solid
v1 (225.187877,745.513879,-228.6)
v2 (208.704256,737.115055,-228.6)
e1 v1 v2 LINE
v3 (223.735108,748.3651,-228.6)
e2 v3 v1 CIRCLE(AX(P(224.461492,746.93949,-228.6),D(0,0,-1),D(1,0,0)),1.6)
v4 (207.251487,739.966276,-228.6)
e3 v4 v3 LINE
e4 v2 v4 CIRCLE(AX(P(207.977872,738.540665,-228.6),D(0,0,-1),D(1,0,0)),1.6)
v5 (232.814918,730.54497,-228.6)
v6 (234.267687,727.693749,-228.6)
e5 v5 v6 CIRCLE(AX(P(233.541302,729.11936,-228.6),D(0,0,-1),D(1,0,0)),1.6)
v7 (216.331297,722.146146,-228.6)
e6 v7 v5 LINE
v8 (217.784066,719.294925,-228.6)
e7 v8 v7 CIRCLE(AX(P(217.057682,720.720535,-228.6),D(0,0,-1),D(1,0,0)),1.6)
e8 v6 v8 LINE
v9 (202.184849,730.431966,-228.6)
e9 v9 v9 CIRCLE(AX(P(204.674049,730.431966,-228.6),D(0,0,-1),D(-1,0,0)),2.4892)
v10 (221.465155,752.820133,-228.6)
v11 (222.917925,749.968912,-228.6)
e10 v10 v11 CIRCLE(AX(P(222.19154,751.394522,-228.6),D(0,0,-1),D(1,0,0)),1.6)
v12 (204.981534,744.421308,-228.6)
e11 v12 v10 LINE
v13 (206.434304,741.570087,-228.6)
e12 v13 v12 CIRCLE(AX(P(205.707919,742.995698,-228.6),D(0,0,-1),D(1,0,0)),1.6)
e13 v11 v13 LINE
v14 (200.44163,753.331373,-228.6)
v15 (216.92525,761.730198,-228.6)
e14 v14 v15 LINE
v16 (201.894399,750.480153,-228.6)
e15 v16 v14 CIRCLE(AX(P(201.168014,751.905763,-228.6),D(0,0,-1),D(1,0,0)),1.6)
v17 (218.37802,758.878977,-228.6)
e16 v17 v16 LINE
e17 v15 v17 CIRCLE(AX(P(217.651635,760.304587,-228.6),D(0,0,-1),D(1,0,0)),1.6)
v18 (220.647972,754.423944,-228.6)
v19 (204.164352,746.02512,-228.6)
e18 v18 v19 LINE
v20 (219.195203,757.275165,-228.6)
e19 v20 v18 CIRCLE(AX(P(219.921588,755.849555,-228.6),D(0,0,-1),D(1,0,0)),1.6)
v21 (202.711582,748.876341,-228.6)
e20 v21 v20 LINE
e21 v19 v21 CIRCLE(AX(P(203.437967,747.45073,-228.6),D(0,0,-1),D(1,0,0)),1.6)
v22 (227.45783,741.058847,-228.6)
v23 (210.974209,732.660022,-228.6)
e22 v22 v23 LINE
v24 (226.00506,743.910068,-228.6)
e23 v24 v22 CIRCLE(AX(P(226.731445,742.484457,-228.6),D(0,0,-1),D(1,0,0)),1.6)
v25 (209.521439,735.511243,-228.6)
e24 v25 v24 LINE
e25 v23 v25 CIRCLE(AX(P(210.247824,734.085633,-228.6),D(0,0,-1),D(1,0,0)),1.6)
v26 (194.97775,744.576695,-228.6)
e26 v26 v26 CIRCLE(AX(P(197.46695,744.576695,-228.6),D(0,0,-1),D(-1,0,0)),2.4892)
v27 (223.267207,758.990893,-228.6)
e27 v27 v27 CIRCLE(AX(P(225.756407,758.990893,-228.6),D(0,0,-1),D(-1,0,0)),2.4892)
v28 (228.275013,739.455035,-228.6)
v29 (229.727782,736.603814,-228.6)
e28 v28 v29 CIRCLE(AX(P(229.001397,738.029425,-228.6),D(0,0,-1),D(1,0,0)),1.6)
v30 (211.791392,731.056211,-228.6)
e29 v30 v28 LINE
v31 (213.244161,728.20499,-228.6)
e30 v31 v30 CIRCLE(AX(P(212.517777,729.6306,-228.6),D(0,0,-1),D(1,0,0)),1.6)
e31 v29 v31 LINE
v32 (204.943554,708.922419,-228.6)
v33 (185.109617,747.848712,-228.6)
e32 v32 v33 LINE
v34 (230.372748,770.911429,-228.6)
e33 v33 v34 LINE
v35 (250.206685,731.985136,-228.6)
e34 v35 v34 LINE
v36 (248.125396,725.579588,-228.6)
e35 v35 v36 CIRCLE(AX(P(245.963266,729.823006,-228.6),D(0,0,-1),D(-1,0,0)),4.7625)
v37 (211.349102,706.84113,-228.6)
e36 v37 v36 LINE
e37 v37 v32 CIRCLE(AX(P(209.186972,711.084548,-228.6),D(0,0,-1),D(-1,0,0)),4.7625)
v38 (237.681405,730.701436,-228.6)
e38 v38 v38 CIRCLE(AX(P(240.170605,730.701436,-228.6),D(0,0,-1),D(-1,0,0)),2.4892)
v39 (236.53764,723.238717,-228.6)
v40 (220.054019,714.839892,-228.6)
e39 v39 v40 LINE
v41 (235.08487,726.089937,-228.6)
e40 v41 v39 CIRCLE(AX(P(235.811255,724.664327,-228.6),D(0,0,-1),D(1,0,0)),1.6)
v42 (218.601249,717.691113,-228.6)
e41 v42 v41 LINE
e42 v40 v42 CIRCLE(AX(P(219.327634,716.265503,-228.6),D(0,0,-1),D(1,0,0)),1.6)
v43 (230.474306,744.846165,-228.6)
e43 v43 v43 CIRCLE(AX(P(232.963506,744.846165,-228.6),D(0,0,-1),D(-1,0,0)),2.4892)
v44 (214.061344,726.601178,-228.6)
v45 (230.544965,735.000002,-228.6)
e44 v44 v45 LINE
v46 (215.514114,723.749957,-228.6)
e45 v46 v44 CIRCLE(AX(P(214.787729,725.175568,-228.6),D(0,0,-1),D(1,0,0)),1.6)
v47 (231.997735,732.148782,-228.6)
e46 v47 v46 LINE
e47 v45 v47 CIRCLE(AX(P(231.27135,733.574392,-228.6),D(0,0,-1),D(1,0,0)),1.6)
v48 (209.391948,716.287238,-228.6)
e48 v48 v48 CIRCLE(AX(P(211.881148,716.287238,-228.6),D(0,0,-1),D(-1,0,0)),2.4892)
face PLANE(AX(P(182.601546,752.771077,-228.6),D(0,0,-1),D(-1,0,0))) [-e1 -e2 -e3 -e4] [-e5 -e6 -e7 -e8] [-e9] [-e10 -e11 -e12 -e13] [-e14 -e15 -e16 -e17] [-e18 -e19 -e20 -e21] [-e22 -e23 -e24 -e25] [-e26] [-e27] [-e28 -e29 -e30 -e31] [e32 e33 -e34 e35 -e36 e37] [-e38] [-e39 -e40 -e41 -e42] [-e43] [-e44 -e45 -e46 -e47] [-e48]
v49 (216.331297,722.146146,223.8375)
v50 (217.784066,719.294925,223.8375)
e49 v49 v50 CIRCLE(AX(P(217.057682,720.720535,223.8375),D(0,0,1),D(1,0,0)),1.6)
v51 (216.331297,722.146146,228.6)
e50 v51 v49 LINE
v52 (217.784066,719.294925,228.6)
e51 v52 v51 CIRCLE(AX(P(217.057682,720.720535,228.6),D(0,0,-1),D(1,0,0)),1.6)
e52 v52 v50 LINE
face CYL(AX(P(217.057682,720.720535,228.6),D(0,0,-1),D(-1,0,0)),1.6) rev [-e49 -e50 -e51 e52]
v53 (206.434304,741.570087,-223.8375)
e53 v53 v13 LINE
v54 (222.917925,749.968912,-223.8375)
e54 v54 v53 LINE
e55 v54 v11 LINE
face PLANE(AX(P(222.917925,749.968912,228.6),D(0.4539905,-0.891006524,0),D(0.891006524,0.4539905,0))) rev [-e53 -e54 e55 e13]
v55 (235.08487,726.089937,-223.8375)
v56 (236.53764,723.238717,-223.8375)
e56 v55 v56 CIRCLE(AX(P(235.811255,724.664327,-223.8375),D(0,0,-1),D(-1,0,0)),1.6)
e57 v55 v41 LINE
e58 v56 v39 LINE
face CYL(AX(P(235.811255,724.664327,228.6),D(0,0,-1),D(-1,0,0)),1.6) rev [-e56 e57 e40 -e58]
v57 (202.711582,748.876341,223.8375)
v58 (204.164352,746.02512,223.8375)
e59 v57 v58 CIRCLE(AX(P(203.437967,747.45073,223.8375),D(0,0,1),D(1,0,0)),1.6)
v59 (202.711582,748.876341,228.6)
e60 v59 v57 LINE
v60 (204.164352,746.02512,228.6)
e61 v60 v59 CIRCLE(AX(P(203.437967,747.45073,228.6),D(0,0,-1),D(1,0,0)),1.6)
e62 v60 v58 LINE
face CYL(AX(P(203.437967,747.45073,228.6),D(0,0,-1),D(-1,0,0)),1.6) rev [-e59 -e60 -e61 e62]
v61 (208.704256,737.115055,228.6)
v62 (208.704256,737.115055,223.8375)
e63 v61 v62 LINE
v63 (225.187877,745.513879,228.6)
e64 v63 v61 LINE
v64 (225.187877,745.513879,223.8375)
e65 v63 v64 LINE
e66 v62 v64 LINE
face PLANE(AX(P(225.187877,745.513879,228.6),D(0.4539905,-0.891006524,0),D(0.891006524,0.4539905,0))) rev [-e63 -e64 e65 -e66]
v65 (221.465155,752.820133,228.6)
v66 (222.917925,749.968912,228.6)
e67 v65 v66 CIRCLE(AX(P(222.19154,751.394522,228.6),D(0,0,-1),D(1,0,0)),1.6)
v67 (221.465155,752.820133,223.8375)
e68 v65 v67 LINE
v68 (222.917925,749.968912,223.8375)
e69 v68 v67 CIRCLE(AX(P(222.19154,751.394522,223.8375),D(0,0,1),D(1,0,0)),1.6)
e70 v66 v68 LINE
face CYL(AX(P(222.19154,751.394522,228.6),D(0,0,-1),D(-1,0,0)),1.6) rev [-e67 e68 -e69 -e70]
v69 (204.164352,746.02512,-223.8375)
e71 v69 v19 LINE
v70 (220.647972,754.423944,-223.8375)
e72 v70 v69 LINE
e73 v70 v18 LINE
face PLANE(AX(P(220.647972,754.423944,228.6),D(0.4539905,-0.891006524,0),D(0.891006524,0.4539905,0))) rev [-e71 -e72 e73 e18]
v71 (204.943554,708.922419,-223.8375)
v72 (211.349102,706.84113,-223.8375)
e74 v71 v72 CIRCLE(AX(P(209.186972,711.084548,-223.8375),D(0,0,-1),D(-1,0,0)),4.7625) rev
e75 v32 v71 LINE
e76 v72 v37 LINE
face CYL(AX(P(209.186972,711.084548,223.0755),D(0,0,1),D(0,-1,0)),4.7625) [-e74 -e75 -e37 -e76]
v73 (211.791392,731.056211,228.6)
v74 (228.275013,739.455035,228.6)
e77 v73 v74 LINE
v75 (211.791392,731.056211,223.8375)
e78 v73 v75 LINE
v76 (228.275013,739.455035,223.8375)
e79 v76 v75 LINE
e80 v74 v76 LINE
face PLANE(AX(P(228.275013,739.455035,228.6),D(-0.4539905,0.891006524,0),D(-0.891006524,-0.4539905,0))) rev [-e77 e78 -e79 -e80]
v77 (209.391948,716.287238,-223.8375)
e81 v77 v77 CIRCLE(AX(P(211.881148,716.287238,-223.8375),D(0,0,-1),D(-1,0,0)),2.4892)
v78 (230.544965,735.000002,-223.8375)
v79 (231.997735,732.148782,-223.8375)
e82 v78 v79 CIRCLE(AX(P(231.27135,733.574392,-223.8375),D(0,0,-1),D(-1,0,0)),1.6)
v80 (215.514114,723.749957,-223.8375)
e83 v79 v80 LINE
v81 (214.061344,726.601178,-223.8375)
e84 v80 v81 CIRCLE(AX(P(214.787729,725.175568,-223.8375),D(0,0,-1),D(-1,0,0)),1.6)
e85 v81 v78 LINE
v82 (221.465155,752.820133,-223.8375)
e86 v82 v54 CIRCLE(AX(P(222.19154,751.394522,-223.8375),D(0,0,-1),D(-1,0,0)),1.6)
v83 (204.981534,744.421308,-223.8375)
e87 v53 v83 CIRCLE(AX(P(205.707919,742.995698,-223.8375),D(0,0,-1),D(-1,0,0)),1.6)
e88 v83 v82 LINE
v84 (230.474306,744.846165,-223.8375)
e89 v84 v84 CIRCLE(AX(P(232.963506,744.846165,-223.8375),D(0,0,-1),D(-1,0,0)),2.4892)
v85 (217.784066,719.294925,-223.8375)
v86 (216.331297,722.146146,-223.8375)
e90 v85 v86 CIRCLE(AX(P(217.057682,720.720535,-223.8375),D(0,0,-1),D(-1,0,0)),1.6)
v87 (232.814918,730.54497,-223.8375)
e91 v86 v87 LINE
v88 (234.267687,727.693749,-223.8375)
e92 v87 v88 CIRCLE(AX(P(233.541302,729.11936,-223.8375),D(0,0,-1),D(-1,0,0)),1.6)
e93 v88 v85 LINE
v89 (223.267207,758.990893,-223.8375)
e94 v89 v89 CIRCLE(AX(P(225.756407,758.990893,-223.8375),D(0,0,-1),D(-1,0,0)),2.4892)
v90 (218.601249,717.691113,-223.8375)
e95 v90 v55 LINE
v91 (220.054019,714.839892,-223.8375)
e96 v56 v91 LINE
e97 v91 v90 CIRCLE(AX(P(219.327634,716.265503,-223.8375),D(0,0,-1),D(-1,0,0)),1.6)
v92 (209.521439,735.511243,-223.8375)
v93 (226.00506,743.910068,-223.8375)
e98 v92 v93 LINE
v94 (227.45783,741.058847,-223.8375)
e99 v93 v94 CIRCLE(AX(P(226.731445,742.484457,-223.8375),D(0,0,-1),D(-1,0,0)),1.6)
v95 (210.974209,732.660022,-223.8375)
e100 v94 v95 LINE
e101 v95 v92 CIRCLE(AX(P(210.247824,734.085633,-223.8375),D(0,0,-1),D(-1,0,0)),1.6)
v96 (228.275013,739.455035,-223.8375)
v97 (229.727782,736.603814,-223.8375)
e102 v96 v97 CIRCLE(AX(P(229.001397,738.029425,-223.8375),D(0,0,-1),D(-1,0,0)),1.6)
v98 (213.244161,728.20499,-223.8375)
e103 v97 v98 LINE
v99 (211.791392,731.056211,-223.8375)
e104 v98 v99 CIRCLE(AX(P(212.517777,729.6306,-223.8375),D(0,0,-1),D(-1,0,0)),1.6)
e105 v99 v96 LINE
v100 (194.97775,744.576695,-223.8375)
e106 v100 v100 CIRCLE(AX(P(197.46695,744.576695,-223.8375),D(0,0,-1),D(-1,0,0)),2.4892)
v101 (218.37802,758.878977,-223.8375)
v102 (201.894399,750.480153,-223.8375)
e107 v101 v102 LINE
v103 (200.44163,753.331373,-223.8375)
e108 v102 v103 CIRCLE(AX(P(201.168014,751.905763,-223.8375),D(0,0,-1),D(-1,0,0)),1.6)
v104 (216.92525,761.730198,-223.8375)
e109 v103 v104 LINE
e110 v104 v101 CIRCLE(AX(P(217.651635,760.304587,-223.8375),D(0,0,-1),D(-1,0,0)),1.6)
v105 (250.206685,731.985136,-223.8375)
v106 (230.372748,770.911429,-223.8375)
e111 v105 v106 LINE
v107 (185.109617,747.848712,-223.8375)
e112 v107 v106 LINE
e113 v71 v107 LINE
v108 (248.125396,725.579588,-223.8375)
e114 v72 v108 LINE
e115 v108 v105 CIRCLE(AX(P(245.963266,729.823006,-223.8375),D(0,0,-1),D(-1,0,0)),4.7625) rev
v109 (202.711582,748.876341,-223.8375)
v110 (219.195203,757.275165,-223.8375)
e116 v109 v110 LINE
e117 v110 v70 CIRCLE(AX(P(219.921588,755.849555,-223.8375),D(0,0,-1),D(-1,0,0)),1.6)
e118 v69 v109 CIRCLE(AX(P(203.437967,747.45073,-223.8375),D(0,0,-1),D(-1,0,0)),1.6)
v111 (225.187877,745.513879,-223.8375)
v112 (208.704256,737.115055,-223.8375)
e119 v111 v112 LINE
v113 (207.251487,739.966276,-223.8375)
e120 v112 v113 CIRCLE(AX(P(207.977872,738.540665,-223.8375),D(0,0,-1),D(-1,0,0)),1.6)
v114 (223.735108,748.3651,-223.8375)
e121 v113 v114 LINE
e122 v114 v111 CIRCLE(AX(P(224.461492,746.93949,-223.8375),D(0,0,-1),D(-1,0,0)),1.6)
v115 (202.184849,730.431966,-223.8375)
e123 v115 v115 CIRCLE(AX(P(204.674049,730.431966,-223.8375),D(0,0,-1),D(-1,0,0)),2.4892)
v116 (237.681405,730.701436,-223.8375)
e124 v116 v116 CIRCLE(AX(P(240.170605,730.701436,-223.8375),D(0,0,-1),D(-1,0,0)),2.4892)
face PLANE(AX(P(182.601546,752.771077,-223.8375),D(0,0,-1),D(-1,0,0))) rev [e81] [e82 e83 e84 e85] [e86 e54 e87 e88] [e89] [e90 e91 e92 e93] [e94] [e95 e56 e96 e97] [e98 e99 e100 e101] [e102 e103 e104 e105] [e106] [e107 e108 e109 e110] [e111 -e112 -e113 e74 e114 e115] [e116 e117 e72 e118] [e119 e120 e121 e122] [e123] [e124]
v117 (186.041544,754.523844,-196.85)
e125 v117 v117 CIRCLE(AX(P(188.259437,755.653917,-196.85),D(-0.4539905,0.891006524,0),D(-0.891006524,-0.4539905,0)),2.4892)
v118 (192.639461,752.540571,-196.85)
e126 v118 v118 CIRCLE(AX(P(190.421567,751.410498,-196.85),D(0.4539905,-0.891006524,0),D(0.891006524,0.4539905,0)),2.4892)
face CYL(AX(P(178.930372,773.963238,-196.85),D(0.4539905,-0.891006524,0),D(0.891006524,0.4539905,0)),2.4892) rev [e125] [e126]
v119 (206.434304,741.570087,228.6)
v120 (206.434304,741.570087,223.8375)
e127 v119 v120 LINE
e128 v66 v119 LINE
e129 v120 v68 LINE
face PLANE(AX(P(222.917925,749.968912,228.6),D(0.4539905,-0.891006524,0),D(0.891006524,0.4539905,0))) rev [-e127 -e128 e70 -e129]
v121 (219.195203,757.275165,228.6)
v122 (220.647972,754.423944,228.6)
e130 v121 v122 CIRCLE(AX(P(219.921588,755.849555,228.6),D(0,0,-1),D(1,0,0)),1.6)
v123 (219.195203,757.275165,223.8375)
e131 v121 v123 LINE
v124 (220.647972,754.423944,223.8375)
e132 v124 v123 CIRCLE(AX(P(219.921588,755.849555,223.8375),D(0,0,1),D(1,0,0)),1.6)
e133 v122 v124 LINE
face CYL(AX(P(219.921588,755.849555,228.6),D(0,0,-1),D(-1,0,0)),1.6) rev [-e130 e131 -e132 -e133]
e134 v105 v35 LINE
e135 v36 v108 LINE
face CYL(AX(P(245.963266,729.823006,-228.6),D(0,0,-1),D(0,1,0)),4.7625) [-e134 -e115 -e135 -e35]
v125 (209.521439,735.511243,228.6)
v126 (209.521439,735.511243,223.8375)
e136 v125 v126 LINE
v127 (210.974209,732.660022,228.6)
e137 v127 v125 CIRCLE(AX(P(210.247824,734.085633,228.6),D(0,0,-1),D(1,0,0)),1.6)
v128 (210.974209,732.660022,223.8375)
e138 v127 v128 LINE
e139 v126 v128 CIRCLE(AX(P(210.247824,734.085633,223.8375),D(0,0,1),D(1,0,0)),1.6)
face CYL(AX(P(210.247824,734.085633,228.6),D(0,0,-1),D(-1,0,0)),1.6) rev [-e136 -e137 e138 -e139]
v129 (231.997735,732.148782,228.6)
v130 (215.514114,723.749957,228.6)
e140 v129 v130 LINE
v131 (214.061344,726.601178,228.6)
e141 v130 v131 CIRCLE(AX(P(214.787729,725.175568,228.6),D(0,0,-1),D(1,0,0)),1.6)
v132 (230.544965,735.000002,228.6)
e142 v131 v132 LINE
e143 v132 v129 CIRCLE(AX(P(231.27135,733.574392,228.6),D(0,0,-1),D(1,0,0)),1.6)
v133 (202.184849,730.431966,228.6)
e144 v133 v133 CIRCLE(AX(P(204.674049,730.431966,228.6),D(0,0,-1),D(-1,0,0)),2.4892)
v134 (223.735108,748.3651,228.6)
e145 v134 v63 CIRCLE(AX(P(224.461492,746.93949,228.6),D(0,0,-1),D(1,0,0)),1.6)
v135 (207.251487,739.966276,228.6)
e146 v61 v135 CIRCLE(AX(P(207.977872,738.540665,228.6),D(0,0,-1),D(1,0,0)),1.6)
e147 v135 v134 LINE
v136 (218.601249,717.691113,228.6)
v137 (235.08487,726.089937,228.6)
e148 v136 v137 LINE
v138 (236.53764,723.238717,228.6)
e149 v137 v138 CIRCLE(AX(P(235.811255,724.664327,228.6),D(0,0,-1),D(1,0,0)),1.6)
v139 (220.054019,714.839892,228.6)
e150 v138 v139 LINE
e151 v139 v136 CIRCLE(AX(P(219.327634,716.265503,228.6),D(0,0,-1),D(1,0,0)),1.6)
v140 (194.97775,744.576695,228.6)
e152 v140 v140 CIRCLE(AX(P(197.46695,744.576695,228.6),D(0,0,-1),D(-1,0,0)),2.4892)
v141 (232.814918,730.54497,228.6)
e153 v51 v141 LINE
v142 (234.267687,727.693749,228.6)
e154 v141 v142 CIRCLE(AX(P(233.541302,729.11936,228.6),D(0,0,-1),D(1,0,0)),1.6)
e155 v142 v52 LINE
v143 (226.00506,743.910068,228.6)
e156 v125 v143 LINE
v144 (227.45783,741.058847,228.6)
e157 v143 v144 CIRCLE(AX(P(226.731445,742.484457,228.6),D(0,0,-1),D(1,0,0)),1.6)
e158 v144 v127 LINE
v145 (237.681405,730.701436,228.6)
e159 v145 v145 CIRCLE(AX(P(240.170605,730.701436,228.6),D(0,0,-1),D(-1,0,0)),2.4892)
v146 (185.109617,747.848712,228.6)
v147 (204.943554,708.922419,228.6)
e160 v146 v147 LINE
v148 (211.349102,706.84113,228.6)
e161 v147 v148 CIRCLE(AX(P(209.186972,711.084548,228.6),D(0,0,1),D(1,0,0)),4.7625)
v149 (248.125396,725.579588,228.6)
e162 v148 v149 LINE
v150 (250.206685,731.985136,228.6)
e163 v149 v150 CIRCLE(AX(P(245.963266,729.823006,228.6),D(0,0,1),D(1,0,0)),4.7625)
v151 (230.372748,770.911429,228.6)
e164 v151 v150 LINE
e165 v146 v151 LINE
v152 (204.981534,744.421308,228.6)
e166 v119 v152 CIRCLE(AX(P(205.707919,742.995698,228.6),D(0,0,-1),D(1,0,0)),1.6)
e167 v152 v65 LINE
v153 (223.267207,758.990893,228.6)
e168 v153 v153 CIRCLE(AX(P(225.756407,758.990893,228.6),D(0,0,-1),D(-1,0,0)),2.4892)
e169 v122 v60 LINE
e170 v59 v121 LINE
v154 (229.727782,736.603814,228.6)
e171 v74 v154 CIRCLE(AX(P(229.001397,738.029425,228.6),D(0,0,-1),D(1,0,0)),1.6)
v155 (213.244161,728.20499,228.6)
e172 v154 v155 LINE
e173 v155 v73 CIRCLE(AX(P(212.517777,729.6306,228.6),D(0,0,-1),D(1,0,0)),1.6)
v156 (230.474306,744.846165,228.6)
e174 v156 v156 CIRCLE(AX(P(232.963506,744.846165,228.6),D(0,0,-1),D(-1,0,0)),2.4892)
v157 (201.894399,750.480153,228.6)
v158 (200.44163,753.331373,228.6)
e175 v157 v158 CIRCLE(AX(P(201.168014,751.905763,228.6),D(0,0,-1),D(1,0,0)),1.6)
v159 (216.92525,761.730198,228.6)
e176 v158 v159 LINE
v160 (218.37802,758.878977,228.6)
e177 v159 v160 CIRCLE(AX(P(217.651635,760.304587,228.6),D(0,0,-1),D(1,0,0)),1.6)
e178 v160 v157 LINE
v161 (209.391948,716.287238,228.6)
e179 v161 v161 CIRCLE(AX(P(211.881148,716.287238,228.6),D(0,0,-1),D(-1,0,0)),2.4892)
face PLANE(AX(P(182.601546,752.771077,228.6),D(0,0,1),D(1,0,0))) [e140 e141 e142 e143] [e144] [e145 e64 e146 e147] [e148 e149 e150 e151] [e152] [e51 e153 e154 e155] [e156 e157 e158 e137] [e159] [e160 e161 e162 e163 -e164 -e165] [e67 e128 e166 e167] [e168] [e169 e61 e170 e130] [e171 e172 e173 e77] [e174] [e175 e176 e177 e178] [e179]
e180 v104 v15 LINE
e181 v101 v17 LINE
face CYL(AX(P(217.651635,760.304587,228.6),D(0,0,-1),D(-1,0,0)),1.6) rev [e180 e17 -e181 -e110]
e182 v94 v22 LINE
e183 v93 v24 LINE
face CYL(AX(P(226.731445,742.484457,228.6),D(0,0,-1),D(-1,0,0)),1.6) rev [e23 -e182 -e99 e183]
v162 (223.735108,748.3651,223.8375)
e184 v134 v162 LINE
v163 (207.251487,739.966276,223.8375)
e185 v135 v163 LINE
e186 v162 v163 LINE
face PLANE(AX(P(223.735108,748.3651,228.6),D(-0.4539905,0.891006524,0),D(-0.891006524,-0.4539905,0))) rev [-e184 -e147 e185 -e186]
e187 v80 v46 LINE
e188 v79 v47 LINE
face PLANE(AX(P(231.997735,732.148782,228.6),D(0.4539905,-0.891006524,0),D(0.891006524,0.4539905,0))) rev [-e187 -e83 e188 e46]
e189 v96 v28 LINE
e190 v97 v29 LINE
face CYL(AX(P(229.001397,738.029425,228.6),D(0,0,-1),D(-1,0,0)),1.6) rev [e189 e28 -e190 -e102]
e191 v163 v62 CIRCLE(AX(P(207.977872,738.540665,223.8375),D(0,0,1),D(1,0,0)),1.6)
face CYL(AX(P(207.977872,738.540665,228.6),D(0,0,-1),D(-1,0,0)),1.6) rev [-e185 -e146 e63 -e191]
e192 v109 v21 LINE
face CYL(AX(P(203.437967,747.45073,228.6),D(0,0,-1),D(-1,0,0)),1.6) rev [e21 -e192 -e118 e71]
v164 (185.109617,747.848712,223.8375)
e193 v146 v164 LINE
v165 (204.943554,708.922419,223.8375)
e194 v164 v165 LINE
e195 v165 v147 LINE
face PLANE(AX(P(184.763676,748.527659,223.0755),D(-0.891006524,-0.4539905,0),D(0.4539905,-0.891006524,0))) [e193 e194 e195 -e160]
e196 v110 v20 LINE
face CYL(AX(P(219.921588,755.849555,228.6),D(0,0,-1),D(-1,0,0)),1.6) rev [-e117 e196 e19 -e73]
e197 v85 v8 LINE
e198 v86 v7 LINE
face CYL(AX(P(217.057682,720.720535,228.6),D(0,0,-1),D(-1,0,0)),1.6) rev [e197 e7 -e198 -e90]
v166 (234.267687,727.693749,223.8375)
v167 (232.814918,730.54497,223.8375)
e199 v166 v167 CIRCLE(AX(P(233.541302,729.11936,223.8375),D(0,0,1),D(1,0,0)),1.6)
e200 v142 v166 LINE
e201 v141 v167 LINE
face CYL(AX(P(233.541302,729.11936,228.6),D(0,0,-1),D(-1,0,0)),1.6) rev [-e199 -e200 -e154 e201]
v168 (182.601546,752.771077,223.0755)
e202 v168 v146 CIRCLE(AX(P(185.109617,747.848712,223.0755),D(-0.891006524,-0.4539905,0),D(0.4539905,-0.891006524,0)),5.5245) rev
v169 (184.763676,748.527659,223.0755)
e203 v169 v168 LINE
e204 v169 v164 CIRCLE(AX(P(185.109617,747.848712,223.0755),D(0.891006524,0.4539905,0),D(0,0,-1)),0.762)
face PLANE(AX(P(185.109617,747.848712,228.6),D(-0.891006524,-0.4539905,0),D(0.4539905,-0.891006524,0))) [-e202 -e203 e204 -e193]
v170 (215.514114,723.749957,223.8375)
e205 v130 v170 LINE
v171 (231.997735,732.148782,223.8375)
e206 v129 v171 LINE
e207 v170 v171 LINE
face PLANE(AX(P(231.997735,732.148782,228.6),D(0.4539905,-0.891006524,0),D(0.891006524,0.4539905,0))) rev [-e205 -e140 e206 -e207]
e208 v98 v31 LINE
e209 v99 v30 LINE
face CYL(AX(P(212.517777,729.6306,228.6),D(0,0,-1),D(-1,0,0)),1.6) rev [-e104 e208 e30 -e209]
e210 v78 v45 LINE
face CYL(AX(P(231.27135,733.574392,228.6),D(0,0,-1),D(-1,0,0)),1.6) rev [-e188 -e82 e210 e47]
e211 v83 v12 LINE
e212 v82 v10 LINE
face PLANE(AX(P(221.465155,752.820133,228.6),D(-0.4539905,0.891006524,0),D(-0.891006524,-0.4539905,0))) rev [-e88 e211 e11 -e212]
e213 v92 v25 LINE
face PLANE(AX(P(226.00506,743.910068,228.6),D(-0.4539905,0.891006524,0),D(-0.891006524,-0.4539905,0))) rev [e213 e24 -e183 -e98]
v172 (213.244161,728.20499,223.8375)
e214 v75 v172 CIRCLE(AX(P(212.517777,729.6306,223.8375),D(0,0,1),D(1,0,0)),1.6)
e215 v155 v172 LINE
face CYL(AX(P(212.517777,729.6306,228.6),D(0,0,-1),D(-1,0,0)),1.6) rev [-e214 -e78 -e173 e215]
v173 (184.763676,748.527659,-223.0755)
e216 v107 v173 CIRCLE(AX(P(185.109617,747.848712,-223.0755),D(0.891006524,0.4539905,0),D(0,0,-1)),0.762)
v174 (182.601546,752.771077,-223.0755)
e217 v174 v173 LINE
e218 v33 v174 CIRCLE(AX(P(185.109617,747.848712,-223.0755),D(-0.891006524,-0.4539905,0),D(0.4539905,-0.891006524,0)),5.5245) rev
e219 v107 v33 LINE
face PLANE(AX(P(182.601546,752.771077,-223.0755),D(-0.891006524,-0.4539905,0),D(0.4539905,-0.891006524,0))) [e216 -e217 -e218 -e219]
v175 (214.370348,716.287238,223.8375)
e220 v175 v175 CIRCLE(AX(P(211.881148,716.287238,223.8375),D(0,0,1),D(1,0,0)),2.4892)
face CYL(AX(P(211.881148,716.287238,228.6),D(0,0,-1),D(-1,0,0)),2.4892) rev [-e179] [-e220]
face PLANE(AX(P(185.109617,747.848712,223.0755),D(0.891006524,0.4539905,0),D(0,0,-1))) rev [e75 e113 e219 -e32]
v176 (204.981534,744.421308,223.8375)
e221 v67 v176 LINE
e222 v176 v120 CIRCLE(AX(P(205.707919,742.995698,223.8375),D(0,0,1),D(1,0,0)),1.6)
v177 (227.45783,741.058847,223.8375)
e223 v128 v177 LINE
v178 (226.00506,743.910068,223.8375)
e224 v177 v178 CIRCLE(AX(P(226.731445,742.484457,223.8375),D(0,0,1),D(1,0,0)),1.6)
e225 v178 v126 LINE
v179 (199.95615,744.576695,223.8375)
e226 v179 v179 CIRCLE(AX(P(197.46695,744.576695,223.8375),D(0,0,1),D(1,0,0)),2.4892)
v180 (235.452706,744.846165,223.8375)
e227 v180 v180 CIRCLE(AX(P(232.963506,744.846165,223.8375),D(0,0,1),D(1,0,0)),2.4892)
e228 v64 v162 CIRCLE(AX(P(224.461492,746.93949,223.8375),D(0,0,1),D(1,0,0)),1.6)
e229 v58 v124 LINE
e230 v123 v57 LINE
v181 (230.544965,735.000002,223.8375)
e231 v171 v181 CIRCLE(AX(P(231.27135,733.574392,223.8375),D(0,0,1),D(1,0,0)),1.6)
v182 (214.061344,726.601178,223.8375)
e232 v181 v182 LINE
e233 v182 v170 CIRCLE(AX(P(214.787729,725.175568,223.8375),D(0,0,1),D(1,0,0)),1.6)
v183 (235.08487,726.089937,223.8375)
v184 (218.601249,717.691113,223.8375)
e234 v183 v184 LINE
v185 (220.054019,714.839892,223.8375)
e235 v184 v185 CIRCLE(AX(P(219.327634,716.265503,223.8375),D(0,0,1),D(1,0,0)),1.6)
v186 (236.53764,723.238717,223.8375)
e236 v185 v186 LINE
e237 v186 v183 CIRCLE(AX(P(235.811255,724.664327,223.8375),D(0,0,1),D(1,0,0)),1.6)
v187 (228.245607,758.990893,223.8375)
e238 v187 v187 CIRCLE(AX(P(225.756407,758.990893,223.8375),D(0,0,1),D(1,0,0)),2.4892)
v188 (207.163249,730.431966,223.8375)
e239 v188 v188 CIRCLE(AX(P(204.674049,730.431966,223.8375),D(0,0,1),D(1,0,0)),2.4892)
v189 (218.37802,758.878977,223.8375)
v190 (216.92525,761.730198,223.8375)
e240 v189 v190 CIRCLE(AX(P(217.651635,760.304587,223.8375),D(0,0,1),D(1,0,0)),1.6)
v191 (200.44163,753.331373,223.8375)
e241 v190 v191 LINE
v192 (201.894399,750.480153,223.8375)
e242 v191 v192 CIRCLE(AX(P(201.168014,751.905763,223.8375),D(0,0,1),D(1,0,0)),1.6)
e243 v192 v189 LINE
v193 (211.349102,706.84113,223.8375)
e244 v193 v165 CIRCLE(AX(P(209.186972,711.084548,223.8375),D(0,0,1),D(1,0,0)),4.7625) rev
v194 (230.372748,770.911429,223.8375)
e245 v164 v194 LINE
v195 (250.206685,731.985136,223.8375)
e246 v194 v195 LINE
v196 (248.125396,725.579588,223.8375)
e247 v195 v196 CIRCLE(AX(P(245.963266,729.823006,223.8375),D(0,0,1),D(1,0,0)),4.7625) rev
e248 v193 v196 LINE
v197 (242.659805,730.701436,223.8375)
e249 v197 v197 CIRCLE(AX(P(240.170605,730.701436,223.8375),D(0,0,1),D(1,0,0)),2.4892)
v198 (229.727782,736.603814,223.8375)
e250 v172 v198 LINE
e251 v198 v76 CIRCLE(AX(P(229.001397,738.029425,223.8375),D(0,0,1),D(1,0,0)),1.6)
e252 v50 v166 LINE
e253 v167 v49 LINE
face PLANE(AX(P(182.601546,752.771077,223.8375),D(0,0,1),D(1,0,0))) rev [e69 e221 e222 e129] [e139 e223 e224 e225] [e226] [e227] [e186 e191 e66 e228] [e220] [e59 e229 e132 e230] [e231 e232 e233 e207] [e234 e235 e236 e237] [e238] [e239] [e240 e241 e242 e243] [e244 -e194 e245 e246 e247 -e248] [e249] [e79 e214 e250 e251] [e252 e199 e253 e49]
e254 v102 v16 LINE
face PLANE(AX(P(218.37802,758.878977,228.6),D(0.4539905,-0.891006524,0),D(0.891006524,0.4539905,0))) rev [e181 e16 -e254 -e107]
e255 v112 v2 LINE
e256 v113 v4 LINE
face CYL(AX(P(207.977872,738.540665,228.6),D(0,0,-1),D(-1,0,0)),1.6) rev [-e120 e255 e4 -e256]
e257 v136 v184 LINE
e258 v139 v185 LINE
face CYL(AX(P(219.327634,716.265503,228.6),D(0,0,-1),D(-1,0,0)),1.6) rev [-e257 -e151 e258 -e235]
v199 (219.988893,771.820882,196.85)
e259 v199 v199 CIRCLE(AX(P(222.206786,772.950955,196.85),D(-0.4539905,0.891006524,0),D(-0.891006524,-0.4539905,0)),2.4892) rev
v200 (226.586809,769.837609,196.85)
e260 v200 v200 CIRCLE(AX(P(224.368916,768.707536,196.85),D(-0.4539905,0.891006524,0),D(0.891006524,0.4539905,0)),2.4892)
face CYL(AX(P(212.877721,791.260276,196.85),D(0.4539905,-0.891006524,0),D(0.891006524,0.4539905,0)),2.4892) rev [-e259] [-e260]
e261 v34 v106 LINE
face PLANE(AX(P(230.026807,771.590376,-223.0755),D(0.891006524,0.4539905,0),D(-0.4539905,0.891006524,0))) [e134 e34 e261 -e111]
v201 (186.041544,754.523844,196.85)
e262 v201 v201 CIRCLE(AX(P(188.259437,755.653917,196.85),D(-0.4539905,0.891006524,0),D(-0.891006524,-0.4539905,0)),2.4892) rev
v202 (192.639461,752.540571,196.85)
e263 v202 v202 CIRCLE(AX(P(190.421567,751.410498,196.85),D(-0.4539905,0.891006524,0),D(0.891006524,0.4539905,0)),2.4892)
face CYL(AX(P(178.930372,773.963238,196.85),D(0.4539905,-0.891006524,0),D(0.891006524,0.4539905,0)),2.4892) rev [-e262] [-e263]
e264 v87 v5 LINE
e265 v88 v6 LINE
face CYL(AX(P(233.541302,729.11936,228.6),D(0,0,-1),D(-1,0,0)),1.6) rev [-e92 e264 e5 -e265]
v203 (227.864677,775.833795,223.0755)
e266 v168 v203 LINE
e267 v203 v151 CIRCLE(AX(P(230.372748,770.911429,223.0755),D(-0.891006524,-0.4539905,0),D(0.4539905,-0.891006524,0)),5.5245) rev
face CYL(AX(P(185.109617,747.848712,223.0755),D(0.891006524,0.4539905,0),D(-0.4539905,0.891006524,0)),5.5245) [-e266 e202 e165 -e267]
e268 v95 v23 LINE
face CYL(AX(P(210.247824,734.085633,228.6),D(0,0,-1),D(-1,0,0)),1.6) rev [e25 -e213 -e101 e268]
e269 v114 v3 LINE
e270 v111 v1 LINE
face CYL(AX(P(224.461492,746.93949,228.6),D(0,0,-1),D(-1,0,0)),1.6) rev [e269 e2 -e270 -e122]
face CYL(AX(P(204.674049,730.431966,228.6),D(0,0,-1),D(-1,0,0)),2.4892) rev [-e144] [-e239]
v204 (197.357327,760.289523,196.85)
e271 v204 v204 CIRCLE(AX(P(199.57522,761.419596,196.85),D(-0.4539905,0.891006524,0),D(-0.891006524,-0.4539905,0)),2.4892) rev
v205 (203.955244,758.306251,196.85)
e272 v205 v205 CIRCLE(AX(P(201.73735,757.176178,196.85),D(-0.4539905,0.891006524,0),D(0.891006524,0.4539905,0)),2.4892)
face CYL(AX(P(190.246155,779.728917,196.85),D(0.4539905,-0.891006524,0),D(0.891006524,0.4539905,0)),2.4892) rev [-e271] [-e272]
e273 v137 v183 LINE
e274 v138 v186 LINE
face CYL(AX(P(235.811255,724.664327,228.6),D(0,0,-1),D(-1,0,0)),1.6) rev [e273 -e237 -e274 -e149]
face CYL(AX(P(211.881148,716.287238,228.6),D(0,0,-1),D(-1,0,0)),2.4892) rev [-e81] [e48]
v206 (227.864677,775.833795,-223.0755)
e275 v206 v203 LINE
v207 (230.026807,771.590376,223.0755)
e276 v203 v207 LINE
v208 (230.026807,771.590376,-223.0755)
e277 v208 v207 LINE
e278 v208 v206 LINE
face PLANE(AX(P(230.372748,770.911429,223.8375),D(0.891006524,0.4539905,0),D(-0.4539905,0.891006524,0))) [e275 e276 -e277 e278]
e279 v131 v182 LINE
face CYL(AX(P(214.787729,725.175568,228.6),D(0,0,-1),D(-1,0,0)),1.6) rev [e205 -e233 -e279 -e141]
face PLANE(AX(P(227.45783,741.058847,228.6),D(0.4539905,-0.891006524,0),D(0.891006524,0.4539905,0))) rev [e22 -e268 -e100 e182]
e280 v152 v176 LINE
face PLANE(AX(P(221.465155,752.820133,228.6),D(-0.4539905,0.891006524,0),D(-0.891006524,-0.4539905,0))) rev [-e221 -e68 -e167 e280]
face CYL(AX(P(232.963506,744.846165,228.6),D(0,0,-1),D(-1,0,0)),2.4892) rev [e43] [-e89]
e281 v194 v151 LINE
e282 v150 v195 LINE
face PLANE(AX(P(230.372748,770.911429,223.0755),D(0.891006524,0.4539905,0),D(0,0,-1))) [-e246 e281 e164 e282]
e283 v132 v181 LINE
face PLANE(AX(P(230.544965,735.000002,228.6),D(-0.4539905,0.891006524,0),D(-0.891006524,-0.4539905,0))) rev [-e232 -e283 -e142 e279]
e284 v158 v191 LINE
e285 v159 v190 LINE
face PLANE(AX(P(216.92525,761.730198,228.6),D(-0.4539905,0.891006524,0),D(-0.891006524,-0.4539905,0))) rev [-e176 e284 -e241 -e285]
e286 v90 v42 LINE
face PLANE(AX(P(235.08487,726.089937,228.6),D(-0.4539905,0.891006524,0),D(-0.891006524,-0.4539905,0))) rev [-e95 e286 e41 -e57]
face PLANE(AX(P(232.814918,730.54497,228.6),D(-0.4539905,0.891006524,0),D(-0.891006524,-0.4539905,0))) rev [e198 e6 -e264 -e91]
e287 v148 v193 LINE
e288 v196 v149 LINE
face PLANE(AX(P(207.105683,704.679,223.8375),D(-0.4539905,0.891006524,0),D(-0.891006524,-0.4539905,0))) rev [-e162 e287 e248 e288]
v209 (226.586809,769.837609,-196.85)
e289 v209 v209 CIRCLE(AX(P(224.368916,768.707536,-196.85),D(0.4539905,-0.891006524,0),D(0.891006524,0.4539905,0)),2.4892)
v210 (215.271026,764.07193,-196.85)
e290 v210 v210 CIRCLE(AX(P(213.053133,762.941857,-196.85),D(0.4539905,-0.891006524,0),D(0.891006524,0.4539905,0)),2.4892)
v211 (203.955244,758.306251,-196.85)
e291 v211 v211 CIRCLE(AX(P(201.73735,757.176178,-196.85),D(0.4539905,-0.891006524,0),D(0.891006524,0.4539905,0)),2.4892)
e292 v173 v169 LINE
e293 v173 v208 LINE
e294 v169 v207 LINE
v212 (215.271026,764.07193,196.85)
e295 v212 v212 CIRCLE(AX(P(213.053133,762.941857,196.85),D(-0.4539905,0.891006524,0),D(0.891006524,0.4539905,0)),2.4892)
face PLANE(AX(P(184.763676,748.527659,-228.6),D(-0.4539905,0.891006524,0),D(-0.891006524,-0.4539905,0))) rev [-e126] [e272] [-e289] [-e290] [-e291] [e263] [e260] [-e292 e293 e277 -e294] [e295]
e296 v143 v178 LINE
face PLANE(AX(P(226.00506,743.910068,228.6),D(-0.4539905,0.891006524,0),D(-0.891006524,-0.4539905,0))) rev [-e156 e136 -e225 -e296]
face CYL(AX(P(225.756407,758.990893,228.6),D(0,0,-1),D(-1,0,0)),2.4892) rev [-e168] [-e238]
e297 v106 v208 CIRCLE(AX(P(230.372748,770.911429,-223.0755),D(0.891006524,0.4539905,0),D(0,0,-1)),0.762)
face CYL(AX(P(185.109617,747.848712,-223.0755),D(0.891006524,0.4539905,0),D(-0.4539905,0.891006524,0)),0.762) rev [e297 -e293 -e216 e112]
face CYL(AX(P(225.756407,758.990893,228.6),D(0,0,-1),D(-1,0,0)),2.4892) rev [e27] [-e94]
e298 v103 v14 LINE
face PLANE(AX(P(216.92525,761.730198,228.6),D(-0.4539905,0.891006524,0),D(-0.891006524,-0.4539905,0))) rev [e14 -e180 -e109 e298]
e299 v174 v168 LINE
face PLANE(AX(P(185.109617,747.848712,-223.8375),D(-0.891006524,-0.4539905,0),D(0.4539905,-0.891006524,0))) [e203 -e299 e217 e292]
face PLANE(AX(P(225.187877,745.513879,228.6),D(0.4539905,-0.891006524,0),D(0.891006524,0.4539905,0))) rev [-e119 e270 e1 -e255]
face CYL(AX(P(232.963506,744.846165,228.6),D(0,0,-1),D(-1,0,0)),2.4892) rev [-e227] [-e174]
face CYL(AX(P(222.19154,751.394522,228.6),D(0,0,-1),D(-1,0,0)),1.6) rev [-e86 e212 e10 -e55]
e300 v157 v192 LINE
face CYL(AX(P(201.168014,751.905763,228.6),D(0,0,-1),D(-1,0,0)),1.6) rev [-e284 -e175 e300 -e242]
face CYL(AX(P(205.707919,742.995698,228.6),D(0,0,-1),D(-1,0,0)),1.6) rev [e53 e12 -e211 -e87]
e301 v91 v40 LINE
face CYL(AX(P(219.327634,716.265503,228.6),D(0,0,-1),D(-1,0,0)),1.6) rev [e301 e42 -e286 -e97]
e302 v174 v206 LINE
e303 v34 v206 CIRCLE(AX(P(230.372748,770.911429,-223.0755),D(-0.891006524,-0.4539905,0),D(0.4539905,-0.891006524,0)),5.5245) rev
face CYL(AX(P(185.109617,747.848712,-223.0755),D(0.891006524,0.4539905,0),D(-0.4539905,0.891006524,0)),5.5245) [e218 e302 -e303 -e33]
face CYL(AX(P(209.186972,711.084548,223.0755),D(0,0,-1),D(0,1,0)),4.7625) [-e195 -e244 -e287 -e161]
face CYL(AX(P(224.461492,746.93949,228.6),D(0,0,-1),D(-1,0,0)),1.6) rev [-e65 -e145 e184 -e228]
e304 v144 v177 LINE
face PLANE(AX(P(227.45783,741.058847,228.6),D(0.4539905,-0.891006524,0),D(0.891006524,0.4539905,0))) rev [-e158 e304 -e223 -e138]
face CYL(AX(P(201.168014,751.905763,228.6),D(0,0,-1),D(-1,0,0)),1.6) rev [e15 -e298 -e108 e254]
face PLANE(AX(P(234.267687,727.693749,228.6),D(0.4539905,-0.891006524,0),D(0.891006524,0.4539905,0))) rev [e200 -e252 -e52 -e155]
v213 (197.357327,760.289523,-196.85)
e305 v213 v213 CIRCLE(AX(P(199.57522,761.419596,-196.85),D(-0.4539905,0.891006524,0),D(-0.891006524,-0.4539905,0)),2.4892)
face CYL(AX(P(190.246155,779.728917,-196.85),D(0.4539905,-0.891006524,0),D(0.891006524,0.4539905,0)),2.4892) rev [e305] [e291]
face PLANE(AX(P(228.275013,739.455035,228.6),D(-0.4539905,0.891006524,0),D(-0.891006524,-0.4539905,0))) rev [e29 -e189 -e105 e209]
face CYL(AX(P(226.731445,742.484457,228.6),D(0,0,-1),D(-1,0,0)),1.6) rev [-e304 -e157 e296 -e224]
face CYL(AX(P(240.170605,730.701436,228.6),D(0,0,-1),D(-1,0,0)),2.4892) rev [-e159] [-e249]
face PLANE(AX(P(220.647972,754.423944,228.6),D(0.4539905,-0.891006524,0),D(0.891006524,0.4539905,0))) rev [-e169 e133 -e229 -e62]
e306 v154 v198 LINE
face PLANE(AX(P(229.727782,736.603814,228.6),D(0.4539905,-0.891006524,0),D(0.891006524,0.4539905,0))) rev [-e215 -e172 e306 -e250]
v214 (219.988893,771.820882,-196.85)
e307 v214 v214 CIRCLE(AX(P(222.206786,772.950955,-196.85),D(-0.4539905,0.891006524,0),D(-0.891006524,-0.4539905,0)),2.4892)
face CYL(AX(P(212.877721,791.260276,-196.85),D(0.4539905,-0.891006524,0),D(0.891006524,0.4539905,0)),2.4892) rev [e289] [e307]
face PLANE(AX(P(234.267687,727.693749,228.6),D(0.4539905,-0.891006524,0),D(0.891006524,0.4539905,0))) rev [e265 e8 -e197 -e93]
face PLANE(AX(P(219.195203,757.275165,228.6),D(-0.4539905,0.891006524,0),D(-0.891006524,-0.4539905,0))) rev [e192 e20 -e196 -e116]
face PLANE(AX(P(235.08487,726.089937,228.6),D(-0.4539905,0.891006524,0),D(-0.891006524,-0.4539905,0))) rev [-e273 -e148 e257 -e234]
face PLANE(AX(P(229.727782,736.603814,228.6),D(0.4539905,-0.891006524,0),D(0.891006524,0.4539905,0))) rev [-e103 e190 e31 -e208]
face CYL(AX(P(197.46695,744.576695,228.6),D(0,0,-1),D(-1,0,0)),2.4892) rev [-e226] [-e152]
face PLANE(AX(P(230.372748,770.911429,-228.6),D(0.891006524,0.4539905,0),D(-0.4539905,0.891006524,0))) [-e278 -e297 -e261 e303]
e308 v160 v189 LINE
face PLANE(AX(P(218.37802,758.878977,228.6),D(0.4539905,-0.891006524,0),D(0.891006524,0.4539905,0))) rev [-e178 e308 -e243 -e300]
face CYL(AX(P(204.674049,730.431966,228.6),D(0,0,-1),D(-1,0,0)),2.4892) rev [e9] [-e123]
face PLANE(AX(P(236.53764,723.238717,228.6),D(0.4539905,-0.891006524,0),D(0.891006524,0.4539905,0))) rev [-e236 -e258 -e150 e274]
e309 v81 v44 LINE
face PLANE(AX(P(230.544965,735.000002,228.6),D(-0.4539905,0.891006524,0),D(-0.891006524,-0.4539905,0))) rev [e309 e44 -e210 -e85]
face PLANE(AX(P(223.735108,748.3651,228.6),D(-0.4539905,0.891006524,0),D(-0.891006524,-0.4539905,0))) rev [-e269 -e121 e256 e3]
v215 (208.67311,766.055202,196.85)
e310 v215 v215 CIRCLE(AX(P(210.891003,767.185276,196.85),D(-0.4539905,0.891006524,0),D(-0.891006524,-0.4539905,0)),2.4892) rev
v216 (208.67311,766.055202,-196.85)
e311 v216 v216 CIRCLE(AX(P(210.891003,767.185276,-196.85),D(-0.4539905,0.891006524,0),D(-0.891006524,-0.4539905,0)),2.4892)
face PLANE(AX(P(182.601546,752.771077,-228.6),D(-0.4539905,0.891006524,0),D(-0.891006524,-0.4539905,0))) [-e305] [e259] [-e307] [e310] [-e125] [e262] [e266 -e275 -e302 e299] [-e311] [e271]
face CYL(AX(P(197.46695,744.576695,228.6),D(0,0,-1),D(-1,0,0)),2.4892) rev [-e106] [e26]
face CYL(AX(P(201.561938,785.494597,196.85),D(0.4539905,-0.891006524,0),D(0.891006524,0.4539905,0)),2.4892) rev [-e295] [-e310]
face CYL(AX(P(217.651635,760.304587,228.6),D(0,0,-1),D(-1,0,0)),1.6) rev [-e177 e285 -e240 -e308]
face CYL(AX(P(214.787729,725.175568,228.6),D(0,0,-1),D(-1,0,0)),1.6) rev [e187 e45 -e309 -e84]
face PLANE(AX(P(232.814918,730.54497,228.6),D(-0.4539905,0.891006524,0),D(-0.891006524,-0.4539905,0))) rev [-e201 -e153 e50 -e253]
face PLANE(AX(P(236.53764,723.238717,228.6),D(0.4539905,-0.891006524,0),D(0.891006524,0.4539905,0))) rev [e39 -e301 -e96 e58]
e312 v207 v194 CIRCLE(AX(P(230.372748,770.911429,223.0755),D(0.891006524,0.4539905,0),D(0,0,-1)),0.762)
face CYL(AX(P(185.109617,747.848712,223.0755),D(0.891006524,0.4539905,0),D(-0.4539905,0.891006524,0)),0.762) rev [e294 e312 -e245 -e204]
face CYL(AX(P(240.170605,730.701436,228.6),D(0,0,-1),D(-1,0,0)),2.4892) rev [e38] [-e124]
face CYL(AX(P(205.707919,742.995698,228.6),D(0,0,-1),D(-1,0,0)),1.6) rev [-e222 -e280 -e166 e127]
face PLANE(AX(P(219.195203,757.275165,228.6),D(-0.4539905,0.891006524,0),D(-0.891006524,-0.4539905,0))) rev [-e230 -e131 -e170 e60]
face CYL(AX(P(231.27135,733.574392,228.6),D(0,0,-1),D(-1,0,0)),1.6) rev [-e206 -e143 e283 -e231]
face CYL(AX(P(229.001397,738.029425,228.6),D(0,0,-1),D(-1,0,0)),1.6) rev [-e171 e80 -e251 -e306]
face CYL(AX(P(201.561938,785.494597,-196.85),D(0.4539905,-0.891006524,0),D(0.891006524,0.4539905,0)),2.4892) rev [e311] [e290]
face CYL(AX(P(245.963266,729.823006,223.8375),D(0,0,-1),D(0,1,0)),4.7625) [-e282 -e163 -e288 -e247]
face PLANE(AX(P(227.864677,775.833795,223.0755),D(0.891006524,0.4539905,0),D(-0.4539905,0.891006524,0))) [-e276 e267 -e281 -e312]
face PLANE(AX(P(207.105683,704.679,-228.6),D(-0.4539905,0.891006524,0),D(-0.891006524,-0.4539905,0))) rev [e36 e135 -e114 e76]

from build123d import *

# Parameters (mm, degrees)
BASE_FLANGE1_DEPTH = 50.8
FILLET1_R          = 4.7625
SKETCH18_R         = 2.4892
CUT_EXTRUDE1_DEPTH = 620.376518124
SKETCH20_R         = 2.4892
CUT_EXTRUDE2_DEPTH = 935.779827906
LPATTERN1_START    = -228.6
LPATTERN1_DEPTH    = 457.2


# Read off the part's stored shape, not the designer's step: LPattern1
# Sheet-metal steps are written as plain solids
with BuildPart() as part:
    # Sketch17 → Base-Flange1 (new body)
    with BuildSketch(Plane(origin=(494.7314495, 252.078264185, 0), x_dir=(0, 0, -1), z_dir=(0.8910065241883655, 0.4539904997395516, 0))):
        with BuildLine():
            Line((-228.6, 533.849573814), (-228.6, 582.300073814))
            ThreePointArc((-228.6, 582.300073814), (-226.981911413, 586.206485227), (-223.0755, 587.824573814))
            Line((-223.0755, 587.824573814), (223.0755, 587.824573814))
            ThreePointArc((223.0755, 587.824573814), (226.981911413, 586.206485227), (228.6, 582.300073814))
            Line((228.6, 582.300073814), (228.6, 533.849573814))
            Line((228.6, 533.849573814), (223.8375, 533.849573814))
            Line((223.8375, 533.849573814), (223.8375, 582.300073814))
            ThreePointArc((223.8375, 582.300073814), (223.614315367, 582.838889181), (223.0755, 583.062073814))
            Line((223.0755, 583.062073814), (-223.0755, 583.062073814))
            ThreePointArc((-223.0755, 583.062073814), (-223.614315367, 582.838889181), (-223.8375, 582.300073814))
            Line((-223.8375, 582.300073814), (-223.8375, 533.849573814))
            Line((-223.8375, 533.849573814), (-228.6, 533.849573814))
        make_face()
    extrude(amount=-BASE_FLANGE1_DEPTH)

    # Fillet1
    fillet1_edges = [part.edges().sort_by_distance(p)[0] for p in [
        (252.368814698, 727.741717389, -226.21875),
        (252.368814698, 727.741717389, 226.21875),
        (207.105683269, 704.679000002, -226.21875),
        (207.105683269, 704.679000002, 226.21875),
    ]]
    fillet(fillet1_edges, radius=FILLET1_R)

    # Sketch18 → Cut-Extrude1 (cut, through all)
    with BuildSketch(Plane(origin=(-264.70464227, 519.512111775, 0), x_dir=(0.8910065241883653, 0.4539904997395517, 0), z_dir=(0.4539904997395517, -0.8910065241883653, 0))):
        with Locations((536.200086356, -196.85)):
            Circle(SKETCH18_R)
        with Locations((548.900086356, -196.85)):
            Circle(SKETCH18_R)
        with Locations((523.500086356, -196.85)):
            Circle(SKETCH18_R)
        with Locations((510.800086356, -196.85)):
            Circle(SKETCH18_R)
    cut_extrude1 = extrude(amount=-CUT_EXTRUDE1_DEPTH, mode=Mode.SUBTRACT)

    # Mirror1: Cut-Extrude1 across plane
    add(cut_extrude1.mirror(Plane.XY), mode=Mode.SUBTRACT)

    # Sketch20 → Cut-Extrude2 (cut, through all)
    with BuildSketch(Plane(origin=(0, 0, -228.6), x_dir=(-1, 0, 0), z_dir=(0, 0, -1))):
        with Locations((-240.170605262, 730.70143613)):
            Circle(SKETCH20_R)
        with Locations((-232.963506079, 744.846164702)):
            Circle(SKETCH20_R)
        with Locations((-204.674048936, 730.431966335)):
            Circle(SKETCH20_R)
        with Locations((-211.881148119, 716.287237764)):
            Circle(SKETCH20_R)
        with Locations((-197.466949753, 744.576694907)):
            Circle(SKETCH20_R)
        with Locations((-225.756406896, 758.990893273)):
            Circle(SKETCH20_R)
        with BuildLine():
            Line((-235.084869956, 726.089937384), (-218.601249184, 717.691113101))
            ThreePointArc((-218.601249184, 717.691113101), (-217.902023556, 715.539117896), (-220.054018761, 714.839892268))
            Line((-220.054018761, 714.839892268), (-236.537639533, 723.238716552))
            ThreePointArc((-236.537639533, 723.238716552), (-237.236865161, 725.390711756), (-235.084869956, 726.089937384))
        make_face()
    extrude(amount=-CUT_EXTRUDE2_DEPTH, mode=Mode.SUBTRACT)

    # LPattern1 outline → LPattern1 (cut)
    with BuildSketch(Plane.XY.offset(LPATTERN1_START)):
        with BuildLine():
            ThreePointArc((200.441629536, 753.331373399), (199.742403908, 751.179378195), (201.894399112, 750.480152566))
            Line((201.894399112, 750.480152566), (218.378019885, 758.878976849))
            ThreePointArc((218.378019885, 758.878976849), (219.077245513, 761.030972054), (216.925250308, 761.730197682))
            Line((216.925250308, 761.730197682), (200.441629536, 753.331373399))
        make_face()
        with BuildLine():
            ThreePointArc((202.711581992, 748.876340861), (202.012356364, 746.724345657), (204.164351568, 746.025120028))
            Line((204.164351568, 746.025120028), (220.647972341, 754.423944312))
            ThreePointArc((220.647972341, 754.423944312), (221.347197969, 756.575939517), (219.195202764, 757.275165145))
            Line((219.195202764, 757.275165145), (202.711581992, 748.876340861))
        make_face()
        with BuildLine():
            ThreePointArc((204.981534448, 744.421308324), (204.28230882, 742.26931312), (206.434304024, 741.570087491))
            Line((206.434304024, 741.570087491), (222.917924797, 749.968911775))
            ThreePointArc((222.917924797, 749.968911775), (223.617150425, 752.12090698), (221.46515522, 752.820132607))
            Line((221.46515522, 752.820132607), (204.981534448, 744.421308324))
        make_face()
        with BuildLine():
            ThreePointArc((207.251486904, 739.966275787), (206.552261276, 737.814280582), (208.704256481, 737.115054954))
            Line((208.704256481, 737.115054954), (225.187877253, 745.513879237))
            ThreePointArc((225.187877253, 745.513879237), (225.887102881, 747.665874442), (223.735107676, 748.36510007))
            Line((223.735107676, 748.36510007), (207.251486904, 739.966275787))
        make_face()
        with BuildLine():
            ThreePointArc((209.52143936, 735.51124325), (208.822213732, 733.359248045), (210.974208937, 732.660022417))
            Line((210.974208937, 732.660022417), (227.457829709, 741.0588467))
            ThreePointArc((227.457829709, 741.0588467), (228.157055337, 743.210841905), (226.005060132, 743.910067533))
            Line((226.005060132, 743.910067533), (209.52143936, 735.51124325))
        make_face()
        with BuildLine():
            ThreePointArc((211.791391816, 731.056210713), (211.092166188, 728.904215508), (213.244161393, 728.20498988))
            Line((213.244161393, 728.20498988), (229.727782165, 736.603814163))
            ThreePointArc((229.727782165, 736.603814163), (230.427007793, 738.755809368), (228.275012588, 739.455034996))
            Line((228.275012588, 739.455034996), (211.791391816, 731.056210713))
        make_face()
        with BuildLine():
            ThreePointArc((214.061344272, 726.601178175), (213.362118644, 724.44918297), (215.514113849, 723.749957343))
            Line((215.514113849, 723.749957343), (231.997734621, 732.148781626))
            ThreePointArc((231.997734621, 732.148781626), (232.696960249, 734.300776831), (230.544965044, 735.000002459))
            Line((230.544965044, 735.000002459), (214.061344272, 726.601178175))
        make_face()
        with BuildLine():
            ThreePointArc((216.331296728, 722.146145638), (215.6320711, 719.994150433), (217.784066305, 719.294924805))
            Line((217.784066305, 719.294924805), (234.267687077, 727.693749089))
            ThreePointArc((234.267687077, 727.693749089), (234.966912705, 729.845744294), (232.8149175, 730.544969922))
            Line((232.8149175, 730.544969922), (216.331296728, 722.146145638))
        make_face()
    extrude(amount=LPATTERN1_DEPTH, mode=Mode.SUBTRACT)


solid = part.part
